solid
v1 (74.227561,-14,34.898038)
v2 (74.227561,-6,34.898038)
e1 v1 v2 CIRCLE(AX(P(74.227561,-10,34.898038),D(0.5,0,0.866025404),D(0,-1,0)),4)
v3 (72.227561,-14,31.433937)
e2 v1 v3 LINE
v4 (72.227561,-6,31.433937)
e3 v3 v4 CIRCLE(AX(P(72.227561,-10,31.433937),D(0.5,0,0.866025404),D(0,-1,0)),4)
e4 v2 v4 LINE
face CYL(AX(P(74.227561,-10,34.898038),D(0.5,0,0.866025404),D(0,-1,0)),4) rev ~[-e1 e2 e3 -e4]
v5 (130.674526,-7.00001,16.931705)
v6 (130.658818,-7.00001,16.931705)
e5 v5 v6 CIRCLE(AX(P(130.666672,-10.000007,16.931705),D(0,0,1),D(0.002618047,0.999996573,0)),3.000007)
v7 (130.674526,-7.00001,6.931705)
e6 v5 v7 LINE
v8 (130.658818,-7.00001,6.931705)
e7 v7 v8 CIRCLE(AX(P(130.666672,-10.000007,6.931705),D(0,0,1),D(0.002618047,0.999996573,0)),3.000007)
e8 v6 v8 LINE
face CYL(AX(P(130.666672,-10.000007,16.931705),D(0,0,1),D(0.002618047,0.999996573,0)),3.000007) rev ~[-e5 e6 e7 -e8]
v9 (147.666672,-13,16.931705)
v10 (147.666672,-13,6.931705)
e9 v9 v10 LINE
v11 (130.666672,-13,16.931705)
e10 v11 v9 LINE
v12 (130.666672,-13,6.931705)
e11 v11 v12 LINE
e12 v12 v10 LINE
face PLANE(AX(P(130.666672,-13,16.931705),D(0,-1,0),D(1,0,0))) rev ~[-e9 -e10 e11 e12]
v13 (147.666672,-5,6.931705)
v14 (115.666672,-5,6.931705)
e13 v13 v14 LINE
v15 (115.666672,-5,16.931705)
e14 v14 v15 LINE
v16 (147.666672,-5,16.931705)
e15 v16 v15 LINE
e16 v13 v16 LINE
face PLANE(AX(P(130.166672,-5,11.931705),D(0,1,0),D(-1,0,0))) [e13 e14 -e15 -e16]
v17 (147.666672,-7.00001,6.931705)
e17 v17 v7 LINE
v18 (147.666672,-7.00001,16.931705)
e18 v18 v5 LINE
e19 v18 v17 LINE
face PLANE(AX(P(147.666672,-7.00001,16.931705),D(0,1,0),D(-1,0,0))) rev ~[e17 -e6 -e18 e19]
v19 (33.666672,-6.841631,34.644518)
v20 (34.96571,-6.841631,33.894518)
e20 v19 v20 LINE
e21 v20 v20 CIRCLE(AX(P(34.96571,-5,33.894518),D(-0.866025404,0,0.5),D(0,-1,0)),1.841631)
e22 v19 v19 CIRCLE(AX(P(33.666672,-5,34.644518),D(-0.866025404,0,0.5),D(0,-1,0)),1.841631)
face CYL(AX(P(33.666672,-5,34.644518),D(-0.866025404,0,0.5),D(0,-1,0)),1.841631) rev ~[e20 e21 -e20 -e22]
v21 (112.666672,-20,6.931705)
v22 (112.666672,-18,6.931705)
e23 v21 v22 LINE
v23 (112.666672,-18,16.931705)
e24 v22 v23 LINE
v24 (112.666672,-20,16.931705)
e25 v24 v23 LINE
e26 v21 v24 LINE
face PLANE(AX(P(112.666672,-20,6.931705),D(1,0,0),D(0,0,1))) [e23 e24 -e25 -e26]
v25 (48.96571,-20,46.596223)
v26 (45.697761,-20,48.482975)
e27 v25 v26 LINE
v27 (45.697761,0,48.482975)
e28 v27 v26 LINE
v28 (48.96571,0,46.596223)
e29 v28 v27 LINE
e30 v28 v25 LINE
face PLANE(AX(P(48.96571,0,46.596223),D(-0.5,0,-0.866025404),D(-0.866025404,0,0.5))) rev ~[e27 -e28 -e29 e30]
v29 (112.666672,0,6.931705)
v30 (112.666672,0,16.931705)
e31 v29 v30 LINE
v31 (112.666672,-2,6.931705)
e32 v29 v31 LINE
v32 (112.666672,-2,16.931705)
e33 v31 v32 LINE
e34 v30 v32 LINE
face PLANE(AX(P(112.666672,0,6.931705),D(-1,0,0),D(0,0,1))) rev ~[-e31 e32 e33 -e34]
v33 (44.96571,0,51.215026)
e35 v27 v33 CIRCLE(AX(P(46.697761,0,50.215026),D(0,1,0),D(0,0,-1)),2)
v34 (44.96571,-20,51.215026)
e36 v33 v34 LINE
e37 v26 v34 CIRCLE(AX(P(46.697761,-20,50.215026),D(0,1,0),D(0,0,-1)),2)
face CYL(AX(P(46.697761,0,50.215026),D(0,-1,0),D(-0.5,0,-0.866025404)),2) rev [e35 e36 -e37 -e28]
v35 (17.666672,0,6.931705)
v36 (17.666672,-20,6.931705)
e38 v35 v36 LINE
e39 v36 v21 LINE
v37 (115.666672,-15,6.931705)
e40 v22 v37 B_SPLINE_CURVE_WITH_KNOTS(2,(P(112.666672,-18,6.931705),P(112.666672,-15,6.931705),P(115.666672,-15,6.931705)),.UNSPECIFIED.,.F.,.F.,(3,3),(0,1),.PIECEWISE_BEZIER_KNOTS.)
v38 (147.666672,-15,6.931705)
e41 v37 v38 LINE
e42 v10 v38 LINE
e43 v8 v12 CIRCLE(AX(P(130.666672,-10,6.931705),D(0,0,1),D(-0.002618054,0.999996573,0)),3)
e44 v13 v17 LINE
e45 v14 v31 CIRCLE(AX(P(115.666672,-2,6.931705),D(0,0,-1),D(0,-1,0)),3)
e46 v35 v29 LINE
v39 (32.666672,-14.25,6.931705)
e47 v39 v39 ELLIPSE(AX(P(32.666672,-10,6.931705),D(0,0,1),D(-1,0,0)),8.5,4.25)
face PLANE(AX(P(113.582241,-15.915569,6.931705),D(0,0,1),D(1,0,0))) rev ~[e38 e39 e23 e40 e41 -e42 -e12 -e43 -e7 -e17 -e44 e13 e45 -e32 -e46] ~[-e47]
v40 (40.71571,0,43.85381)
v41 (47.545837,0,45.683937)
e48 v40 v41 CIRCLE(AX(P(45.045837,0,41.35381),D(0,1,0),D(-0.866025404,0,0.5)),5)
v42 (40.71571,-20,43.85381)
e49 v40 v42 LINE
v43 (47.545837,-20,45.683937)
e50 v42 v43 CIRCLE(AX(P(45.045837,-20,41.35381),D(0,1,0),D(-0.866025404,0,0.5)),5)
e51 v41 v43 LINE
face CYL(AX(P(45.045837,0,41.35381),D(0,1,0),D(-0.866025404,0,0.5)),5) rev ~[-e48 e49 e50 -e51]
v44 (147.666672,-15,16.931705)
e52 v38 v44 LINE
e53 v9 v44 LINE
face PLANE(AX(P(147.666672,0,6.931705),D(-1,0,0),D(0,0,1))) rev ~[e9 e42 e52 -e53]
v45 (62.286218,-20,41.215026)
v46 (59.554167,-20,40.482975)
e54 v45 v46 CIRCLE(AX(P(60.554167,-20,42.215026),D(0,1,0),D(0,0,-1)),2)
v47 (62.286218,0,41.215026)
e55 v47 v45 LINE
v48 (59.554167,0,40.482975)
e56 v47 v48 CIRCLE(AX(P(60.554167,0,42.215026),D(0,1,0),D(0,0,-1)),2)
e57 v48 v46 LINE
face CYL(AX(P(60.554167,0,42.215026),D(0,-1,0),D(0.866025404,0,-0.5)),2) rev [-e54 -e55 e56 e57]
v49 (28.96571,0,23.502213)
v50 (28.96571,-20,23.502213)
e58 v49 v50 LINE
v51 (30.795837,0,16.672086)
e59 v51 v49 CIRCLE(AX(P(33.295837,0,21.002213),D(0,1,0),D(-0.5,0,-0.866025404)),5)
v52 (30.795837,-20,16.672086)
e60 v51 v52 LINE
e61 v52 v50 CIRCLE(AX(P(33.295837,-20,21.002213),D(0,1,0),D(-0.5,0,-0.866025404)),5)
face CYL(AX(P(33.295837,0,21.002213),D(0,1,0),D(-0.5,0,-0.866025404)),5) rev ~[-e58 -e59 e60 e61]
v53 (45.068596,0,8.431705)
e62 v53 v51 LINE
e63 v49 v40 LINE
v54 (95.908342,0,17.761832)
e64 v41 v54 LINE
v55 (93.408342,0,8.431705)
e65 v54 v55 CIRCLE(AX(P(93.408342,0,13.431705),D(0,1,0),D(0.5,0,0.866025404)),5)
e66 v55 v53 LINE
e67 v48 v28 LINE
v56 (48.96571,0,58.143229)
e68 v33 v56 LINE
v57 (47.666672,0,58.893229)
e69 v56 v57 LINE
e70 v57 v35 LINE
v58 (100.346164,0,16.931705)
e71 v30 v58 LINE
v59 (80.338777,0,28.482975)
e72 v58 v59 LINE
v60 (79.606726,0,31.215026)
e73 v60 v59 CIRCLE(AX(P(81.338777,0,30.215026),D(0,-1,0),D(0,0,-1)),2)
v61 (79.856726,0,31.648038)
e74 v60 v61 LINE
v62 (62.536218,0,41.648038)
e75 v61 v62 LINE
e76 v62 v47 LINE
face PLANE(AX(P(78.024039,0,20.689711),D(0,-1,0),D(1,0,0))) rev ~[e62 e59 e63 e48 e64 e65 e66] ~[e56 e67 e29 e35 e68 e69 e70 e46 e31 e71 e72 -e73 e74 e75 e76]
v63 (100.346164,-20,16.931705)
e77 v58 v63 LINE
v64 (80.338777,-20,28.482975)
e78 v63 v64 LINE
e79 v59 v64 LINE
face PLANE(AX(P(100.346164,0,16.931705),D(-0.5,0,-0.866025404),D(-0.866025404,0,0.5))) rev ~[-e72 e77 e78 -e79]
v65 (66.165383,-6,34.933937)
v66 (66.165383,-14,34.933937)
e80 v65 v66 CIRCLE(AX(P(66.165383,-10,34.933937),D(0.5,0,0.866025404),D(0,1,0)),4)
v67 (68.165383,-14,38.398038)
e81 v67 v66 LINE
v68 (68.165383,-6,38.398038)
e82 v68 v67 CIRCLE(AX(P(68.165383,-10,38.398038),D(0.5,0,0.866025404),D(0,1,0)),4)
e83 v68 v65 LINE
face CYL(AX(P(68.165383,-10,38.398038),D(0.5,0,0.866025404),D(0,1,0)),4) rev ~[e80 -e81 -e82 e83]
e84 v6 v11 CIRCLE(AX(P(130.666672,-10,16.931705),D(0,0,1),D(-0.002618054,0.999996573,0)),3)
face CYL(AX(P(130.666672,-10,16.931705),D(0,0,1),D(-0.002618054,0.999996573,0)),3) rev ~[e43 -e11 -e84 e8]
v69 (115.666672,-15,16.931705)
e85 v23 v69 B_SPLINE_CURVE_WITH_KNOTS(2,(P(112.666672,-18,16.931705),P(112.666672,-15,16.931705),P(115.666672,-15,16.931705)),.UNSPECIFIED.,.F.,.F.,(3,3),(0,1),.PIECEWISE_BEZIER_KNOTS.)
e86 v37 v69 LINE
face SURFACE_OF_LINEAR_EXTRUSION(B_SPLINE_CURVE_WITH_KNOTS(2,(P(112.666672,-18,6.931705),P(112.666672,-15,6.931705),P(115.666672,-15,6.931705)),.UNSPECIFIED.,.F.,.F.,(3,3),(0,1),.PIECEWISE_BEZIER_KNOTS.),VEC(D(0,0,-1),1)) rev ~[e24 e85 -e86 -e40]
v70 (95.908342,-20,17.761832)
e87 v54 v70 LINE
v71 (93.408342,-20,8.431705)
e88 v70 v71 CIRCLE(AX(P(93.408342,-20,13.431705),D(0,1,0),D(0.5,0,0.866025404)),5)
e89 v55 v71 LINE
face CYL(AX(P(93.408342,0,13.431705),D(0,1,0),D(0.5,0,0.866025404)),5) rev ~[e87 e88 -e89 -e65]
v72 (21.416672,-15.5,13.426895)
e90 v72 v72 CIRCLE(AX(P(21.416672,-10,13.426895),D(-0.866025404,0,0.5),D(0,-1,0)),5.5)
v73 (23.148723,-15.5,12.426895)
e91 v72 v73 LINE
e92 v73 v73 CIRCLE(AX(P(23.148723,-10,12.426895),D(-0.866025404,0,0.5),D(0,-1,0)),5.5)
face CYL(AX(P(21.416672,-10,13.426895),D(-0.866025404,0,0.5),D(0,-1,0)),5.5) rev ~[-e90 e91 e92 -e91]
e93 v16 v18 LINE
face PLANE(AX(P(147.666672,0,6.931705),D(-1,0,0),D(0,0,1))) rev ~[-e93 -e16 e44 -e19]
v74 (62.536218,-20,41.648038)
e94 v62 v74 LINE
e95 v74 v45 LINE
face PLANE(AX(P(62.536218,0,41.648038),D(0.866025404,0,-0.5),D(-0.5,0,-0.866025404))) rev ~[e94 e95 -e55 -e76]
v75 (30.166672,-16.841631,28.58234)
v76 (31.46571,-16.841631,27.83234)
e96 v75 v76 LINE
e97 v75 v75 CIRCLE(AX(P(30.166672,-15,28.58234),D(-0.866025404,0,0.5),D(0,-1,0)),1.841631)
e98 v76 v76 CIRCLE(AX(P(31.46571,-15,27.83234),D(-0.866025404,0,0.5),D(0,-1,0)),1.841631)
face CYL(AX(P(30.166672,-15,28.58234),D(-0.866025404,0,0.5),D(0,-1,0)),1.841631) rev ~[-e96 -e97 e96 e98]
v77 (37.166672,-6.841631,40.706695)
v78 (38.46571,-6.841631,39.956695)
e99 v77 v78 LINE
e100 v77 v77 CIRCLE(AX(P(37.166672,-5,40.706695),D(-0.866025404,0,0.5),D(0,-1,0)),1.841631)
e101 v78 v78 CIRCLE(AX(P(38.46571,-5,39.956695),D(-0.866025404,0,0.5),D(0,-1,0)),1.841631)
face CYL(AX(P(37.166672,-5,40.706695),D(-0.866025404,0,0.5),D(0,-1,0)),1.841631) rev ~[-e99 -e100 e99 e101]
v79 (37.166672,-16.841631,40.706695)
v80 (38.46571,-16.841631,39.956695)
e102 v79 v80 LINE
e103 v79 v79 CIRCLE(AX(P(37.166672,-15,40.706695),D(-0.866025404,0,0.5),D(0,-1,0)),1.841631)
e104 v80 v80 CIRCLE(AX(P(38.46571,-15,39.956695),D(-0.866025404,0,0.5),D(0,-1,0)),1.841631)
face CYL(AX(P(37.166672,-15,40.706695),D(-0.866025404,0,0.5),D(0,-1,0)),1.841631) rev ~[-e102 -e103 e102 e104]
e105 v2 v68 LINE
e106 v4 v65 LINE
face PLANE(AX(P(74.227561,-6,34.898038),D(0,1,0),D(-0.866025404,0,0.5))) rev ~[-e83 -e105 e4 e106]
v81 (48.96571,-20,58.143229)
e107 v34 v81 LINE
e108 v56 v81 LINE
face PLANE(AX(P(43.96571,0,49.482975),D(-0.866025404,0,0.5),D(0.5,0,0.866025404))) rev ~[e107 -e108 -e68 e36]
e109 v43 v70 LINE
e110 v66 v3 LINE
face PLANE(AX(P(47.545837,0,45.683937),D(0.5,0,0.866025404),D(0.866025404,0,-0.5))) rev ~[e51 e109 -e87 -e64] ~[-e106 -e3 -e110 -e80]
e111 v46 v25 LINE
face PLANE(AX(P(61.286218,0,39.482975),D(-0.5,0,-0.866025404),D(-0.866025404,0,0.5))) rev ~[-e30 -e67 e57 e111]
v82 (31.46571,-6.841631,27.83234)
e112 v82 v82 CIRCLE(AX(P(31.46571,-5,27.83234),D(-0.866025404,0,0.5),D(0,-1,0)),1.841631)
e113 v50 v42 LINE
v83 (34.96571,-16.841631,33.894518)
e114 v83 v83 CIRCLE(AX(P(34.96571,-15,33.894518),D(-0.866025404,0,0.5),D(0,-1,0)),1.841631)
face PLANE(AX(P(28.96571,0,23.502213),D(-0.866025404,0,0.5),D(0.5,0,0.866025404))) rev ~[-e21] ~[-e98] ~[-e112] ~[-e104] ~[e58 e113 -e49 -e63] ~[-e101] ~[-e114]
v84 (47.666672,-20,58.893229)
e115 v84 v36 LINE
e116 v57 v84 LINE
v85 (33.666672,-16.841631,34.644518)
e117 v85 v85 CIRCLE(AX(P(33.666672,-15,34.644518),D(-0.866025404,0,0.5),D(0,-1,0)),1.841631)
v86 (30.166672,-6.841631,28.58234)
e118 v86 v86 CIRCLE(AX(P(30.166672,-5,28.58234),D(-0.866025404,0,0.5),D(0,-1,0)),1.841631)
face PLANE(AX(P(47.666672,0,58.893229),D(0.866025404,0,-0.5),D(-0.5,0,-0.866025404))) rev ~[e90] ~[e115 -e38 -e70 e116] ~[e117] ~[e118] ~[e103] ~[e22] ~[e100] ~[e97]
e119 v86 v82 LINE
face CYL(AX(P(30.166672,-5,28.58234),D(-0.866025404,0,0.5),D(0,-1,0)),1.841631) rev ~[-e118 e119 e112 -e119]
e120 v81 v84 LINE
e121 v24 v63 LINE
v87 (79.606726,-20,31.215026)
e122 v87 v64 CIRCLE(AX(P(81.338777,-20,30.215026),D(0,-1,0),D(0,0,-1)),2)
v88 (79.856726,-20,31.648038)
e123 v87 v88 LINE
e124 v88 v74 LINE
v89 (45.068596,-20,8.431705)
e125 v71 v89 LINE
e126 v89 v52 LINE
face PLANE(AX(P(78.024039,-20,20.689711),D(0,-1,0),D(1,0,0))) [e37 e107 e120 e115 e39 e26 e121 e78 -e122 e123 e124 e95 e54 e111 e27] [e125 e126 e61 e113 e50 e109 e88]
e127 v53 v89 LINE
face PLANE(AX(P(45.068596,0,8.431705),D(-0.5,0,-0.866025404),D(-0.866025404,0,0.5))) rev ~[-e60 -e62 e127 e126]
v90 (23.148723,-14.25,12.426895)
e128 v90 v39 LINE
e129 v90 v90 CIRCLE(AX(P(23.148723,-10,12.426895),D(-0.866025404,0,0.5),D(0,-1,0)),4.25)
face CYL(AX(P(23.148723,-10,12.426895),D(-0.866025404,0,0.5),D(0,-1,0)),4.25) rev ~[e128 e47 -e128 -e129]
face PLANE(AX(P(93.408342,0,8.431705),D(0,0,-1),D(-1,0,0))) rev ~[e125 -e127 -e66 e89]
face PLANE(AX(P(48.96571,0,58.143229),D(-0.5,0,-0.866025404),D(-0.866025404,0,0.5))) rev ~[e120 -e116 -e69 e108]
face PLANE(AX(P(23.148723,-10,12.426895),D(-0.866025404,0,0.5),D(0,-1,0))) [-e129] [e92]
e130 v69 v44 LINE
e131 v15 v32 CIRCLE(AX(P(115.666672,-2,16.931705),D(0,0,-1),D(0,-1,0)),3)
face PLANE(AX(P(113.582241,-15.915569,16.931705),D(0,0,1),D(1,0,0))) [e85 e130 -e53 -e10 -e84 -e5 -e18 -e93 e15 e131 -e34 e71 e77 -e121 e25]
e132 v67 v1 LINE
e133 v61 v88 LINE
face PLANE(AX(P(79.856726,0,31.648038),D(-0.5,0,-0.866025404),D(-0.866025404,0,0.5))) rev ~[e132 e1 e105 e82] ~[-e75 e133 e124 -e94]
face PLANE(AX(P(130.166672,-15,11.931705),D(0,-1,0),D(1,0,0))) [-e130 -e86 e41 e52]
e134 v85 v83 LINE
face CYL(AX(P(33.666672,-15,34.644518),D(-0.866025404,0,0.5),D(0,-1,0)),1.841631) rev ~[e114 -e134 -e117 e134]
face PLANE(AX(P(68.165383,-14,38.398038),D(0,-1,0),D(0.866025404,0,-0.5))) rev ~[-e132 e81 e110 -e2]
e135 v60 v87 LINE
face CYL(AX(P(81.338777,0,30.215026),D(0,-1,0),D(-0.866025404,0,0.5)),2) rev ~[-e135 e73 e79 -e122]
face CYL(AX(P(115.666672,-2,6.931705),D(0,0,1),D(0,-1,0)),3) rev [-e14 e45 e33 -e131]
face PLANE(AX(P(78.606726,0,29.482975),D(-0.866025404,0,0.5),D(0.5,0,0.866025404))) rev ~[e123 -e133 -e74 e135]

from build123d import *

# Parameters (mm, degrees)
F1_DEPTH    = 20
F2_W        = 35
F2_H        = 10
F3_DEPTH    = 5
F4_W        = 35
F4_H        = 10
F5_DEPTH    = 5
F7_DEPTH    = 25
F8_T1_DEPTH = 10
F9_R        = 3
F10_R       = 2
F11_R       = 2
F12_R       = 2
F14_DEPTH   = 15
F15_R       = 5.5
F16_DEPTH   = 2
F17_R       = 4.25
F18_DEPTH   = 110.5843026286
F19_R       = 1.8416313508
F20_DEPTH   = 10


# Not quite as in the source:
# - a fillet or chamfer that OpenCascade refuses, or shapes differently, is made with other operations: its cross-section is extruded or revolved along the edge and cut away or added


with BuildPart() as f1:
    # F0 (on Front) → F1 (new body)
    with BuildSketch(Plane.XZ):
        Polygon((48.965709947, 58.1432288134), (47.6666718414, 58.8932288134), (17.6666718414, 6.9317045863), (147.6666718414, 6.9317045863), (147.6666718414, 16.9317045863), (100.3461637657, 16.9317045863), (78.6067260984, 29.4829747755), (79.8567260984, 31.648038285), (62.5362180227, 41.648038285), (61.2862180227, 39.4829747755), (48.965709947, 46.5962234296), (43.965709947, 49.4829747755), align=None)
        with BuildLine():
            Line((45.06859563, 8.4317045863), (30.795836966, 16.6720856431))
            ThreePointArc((30.795836966, 16.6720856431), (28.4662078345, 19.7081174365), (28.965709947, 23.502212662))
            Line((28.965709947, 23.502212662), (40.715709947, 43.8538096509))
            ThreePointArc((40.715709947, 43.8538096509), (43.7517417405, 46.1834387824), (47.545836966, 45.6839366698))
            Line((47.545836966, 45.6839366698), (95.9083415922, 17.7618316052))
            ThreePointArc((95.9083415922, 17.7618316052), (98.2379707236, 12.1376093608), (93.4083415922, 8.4317045863))
            Line((93.4083415922, 8.4317045863), (45.06859563, 8.4317045863))
        make_face(mode=Mode.SUBTRACT)
    extrude(amount=F1_DEPTH)

    # F2 (on face) → F3 (cut)
    with BuildSketch(Plane.XZ.offset(20)):
        with Locations((130.1666718414, 11.9317045863)):
            Rectangle(F2_W, F2_H)
    extrude(amount=-F3_DEPTH, mode=Mode.SUBTRACT)

    # F4 (on face) → F5 (cut)
    with BuildSketch(Plane(origin=(0, 0, 0), x_dir=(-1, 0, 0), z_dir=(0, 1, 0))):
        with Locations((-130.1666718414, 11.9317045863)):
            Rectangle(F4_W, F4_H)
    extrude(amount=-F5_DEPTH, mode=Mode.SUBTRACT)

    # F6 (on face) → F7 (cut)
    with BuildSketch(Plane.XY.offset(16.9317045863)):
        with BuildLine():
            Line((147.6666718414, -7.0000102813), (130.6745260024, -7.0000102813))
            ThreePointArc((130.6745260024, -7.0000102813), (130.6666718414, -7), (130.6588176804, -7.0000102813))
            ThreePointArc((130.6588176804, -7.0000102813), (127.6666744117, -10.0039270839), (130.6666718414, -13))
            Line((130.6666718414, -13), (147.6666718414, -13))
            Line((147.6666718414, -13), (147.6666718414, -7.0000102813))
        make_face()
    extrude(amount=-F7_DEPTH, mode=Mode.SUBTRACT)

    # F8: fillet of radius 3 on 1 edges, made by hand

    # F8_s2 → F8_t1 (join)
    with BuildSketch(Plane.XY.offset(6.9317045863)):
        with BuildLine():
            add(Edge.make_bspline(
                [(112.6666718414, -18), (112.6666718414, -15), (115.6666718414, -15)],
                knots=[0, 0, 0, 1, 1, 1], degree=2, weights=[1, 1, 1]))
            Line((115.6666718414, -15), (112.6666718414, -15))
            Line((112.6666718414, -15), (112.6666718414, -18))
        make_face()
    extrude(amount=F8_T1_DEPTH)

    # F9
    f9_edges = [f1.edges().sort_by_distance(p)[0] for p in [
        (112.666672, -5, 11.931705),
    ]]
    fillet(f9_edges, radius=F9_R)

    # F10
    f10_edges = [f1.edges().sort_by_distance(p)[0] for p in [
        (78.606726, -10, 29.482975),
    ]]
    fillet(f10_edges, radius=F10_R)

    # F11
    f11_edges = [f1.edges().sort_by_distance(p)[0] for p in [
        (61.286218, -10, 39.482975),
    ]]
    fillet(f11_edges, radius=F11_R)

    # F12
    f12_edges = [f1.edges().sort_by_distance(p)[0] for p in [
        (43.96571, -10, 49.482975),
    ]]
    fillet(f12_edges, radius=F12_R)

    # F13 (on face) → F14 (cut)
    with BuildSketch(Plane(origin=(33.668184092, 0, 58.3150054459), x_dir=(0.8660254038, 0, -0.5), z_dir=(0.5, 0, 0.8660254038))):
        with BuildLine():
            Line((46.8339343218, -6), (39.8339343218, -6))
            ThreePointArc((39.8339343218, -6), (35.8339343218, -10), (39.8339343218, -14))
            Line((39.8339343218, -14), (46.8339343218, -14))
            ThreePointArc((46.8339343218, -14), (50.8339343218, -10), (46.8339343218, -6))
        make_face()
    extrude(amount=-F14_DEPTH, mode=Mode.SUBTRACT)

    # F15 (on face) → F16 (cut)
    with BuildSketch(Plane(origin=(10.2484877494, 0, -5.9169671609), x_dir=(0, -1, 0), z_dir=(-0.8660254038, 0, 0.5))):
        with Locations((10, 22.3363681839)):
            Circle(F15_R)
    extrude(amount=-F16_DEPTH, mode=Mode.SUBTRACT)

    # F17 (on face) → F18 (cut, through all)
    with BuildSketch(Plane(origin=(11.980538557, 0, -6.9169671609), x_dir=(0, -1, 0), z_dir=(-0.8660254038, 0, 0.5))):
        with Locations((10, 22.3363681839)):
            Circle(F17_R)
    extrude(amount=-F18_DEPTH, mode=Mode.SUBTRACT)

    # F19 (on face) → F20 (cut)
    with BuildSketch(Plane(origin=(10.2484877494, 0, -5.9169671609), x_dir=(0, -1, 0), z_dir=(-0.8660254038, 0, 0.5))):
        with Locations((15, 53.8363681839)):
            Circle(F19_R)
        with Locations((5, 53.8363681839)):
            Circle(F19_R)
        with Locations((5, 46.8363681839)):
            Circle(F19_R)
        with Locations((15, 46.8363681839)):
            Circle(F19_R)
        with Locations((15, 39.8363681839)):
            Circle(F19_R)
        with Locations((5, 39.8363681839)):
            Circle(F19_R)
    extrude(amount=-F20_DEPTH, mode=Mode.SUBTRACT)


solid = f1.part
